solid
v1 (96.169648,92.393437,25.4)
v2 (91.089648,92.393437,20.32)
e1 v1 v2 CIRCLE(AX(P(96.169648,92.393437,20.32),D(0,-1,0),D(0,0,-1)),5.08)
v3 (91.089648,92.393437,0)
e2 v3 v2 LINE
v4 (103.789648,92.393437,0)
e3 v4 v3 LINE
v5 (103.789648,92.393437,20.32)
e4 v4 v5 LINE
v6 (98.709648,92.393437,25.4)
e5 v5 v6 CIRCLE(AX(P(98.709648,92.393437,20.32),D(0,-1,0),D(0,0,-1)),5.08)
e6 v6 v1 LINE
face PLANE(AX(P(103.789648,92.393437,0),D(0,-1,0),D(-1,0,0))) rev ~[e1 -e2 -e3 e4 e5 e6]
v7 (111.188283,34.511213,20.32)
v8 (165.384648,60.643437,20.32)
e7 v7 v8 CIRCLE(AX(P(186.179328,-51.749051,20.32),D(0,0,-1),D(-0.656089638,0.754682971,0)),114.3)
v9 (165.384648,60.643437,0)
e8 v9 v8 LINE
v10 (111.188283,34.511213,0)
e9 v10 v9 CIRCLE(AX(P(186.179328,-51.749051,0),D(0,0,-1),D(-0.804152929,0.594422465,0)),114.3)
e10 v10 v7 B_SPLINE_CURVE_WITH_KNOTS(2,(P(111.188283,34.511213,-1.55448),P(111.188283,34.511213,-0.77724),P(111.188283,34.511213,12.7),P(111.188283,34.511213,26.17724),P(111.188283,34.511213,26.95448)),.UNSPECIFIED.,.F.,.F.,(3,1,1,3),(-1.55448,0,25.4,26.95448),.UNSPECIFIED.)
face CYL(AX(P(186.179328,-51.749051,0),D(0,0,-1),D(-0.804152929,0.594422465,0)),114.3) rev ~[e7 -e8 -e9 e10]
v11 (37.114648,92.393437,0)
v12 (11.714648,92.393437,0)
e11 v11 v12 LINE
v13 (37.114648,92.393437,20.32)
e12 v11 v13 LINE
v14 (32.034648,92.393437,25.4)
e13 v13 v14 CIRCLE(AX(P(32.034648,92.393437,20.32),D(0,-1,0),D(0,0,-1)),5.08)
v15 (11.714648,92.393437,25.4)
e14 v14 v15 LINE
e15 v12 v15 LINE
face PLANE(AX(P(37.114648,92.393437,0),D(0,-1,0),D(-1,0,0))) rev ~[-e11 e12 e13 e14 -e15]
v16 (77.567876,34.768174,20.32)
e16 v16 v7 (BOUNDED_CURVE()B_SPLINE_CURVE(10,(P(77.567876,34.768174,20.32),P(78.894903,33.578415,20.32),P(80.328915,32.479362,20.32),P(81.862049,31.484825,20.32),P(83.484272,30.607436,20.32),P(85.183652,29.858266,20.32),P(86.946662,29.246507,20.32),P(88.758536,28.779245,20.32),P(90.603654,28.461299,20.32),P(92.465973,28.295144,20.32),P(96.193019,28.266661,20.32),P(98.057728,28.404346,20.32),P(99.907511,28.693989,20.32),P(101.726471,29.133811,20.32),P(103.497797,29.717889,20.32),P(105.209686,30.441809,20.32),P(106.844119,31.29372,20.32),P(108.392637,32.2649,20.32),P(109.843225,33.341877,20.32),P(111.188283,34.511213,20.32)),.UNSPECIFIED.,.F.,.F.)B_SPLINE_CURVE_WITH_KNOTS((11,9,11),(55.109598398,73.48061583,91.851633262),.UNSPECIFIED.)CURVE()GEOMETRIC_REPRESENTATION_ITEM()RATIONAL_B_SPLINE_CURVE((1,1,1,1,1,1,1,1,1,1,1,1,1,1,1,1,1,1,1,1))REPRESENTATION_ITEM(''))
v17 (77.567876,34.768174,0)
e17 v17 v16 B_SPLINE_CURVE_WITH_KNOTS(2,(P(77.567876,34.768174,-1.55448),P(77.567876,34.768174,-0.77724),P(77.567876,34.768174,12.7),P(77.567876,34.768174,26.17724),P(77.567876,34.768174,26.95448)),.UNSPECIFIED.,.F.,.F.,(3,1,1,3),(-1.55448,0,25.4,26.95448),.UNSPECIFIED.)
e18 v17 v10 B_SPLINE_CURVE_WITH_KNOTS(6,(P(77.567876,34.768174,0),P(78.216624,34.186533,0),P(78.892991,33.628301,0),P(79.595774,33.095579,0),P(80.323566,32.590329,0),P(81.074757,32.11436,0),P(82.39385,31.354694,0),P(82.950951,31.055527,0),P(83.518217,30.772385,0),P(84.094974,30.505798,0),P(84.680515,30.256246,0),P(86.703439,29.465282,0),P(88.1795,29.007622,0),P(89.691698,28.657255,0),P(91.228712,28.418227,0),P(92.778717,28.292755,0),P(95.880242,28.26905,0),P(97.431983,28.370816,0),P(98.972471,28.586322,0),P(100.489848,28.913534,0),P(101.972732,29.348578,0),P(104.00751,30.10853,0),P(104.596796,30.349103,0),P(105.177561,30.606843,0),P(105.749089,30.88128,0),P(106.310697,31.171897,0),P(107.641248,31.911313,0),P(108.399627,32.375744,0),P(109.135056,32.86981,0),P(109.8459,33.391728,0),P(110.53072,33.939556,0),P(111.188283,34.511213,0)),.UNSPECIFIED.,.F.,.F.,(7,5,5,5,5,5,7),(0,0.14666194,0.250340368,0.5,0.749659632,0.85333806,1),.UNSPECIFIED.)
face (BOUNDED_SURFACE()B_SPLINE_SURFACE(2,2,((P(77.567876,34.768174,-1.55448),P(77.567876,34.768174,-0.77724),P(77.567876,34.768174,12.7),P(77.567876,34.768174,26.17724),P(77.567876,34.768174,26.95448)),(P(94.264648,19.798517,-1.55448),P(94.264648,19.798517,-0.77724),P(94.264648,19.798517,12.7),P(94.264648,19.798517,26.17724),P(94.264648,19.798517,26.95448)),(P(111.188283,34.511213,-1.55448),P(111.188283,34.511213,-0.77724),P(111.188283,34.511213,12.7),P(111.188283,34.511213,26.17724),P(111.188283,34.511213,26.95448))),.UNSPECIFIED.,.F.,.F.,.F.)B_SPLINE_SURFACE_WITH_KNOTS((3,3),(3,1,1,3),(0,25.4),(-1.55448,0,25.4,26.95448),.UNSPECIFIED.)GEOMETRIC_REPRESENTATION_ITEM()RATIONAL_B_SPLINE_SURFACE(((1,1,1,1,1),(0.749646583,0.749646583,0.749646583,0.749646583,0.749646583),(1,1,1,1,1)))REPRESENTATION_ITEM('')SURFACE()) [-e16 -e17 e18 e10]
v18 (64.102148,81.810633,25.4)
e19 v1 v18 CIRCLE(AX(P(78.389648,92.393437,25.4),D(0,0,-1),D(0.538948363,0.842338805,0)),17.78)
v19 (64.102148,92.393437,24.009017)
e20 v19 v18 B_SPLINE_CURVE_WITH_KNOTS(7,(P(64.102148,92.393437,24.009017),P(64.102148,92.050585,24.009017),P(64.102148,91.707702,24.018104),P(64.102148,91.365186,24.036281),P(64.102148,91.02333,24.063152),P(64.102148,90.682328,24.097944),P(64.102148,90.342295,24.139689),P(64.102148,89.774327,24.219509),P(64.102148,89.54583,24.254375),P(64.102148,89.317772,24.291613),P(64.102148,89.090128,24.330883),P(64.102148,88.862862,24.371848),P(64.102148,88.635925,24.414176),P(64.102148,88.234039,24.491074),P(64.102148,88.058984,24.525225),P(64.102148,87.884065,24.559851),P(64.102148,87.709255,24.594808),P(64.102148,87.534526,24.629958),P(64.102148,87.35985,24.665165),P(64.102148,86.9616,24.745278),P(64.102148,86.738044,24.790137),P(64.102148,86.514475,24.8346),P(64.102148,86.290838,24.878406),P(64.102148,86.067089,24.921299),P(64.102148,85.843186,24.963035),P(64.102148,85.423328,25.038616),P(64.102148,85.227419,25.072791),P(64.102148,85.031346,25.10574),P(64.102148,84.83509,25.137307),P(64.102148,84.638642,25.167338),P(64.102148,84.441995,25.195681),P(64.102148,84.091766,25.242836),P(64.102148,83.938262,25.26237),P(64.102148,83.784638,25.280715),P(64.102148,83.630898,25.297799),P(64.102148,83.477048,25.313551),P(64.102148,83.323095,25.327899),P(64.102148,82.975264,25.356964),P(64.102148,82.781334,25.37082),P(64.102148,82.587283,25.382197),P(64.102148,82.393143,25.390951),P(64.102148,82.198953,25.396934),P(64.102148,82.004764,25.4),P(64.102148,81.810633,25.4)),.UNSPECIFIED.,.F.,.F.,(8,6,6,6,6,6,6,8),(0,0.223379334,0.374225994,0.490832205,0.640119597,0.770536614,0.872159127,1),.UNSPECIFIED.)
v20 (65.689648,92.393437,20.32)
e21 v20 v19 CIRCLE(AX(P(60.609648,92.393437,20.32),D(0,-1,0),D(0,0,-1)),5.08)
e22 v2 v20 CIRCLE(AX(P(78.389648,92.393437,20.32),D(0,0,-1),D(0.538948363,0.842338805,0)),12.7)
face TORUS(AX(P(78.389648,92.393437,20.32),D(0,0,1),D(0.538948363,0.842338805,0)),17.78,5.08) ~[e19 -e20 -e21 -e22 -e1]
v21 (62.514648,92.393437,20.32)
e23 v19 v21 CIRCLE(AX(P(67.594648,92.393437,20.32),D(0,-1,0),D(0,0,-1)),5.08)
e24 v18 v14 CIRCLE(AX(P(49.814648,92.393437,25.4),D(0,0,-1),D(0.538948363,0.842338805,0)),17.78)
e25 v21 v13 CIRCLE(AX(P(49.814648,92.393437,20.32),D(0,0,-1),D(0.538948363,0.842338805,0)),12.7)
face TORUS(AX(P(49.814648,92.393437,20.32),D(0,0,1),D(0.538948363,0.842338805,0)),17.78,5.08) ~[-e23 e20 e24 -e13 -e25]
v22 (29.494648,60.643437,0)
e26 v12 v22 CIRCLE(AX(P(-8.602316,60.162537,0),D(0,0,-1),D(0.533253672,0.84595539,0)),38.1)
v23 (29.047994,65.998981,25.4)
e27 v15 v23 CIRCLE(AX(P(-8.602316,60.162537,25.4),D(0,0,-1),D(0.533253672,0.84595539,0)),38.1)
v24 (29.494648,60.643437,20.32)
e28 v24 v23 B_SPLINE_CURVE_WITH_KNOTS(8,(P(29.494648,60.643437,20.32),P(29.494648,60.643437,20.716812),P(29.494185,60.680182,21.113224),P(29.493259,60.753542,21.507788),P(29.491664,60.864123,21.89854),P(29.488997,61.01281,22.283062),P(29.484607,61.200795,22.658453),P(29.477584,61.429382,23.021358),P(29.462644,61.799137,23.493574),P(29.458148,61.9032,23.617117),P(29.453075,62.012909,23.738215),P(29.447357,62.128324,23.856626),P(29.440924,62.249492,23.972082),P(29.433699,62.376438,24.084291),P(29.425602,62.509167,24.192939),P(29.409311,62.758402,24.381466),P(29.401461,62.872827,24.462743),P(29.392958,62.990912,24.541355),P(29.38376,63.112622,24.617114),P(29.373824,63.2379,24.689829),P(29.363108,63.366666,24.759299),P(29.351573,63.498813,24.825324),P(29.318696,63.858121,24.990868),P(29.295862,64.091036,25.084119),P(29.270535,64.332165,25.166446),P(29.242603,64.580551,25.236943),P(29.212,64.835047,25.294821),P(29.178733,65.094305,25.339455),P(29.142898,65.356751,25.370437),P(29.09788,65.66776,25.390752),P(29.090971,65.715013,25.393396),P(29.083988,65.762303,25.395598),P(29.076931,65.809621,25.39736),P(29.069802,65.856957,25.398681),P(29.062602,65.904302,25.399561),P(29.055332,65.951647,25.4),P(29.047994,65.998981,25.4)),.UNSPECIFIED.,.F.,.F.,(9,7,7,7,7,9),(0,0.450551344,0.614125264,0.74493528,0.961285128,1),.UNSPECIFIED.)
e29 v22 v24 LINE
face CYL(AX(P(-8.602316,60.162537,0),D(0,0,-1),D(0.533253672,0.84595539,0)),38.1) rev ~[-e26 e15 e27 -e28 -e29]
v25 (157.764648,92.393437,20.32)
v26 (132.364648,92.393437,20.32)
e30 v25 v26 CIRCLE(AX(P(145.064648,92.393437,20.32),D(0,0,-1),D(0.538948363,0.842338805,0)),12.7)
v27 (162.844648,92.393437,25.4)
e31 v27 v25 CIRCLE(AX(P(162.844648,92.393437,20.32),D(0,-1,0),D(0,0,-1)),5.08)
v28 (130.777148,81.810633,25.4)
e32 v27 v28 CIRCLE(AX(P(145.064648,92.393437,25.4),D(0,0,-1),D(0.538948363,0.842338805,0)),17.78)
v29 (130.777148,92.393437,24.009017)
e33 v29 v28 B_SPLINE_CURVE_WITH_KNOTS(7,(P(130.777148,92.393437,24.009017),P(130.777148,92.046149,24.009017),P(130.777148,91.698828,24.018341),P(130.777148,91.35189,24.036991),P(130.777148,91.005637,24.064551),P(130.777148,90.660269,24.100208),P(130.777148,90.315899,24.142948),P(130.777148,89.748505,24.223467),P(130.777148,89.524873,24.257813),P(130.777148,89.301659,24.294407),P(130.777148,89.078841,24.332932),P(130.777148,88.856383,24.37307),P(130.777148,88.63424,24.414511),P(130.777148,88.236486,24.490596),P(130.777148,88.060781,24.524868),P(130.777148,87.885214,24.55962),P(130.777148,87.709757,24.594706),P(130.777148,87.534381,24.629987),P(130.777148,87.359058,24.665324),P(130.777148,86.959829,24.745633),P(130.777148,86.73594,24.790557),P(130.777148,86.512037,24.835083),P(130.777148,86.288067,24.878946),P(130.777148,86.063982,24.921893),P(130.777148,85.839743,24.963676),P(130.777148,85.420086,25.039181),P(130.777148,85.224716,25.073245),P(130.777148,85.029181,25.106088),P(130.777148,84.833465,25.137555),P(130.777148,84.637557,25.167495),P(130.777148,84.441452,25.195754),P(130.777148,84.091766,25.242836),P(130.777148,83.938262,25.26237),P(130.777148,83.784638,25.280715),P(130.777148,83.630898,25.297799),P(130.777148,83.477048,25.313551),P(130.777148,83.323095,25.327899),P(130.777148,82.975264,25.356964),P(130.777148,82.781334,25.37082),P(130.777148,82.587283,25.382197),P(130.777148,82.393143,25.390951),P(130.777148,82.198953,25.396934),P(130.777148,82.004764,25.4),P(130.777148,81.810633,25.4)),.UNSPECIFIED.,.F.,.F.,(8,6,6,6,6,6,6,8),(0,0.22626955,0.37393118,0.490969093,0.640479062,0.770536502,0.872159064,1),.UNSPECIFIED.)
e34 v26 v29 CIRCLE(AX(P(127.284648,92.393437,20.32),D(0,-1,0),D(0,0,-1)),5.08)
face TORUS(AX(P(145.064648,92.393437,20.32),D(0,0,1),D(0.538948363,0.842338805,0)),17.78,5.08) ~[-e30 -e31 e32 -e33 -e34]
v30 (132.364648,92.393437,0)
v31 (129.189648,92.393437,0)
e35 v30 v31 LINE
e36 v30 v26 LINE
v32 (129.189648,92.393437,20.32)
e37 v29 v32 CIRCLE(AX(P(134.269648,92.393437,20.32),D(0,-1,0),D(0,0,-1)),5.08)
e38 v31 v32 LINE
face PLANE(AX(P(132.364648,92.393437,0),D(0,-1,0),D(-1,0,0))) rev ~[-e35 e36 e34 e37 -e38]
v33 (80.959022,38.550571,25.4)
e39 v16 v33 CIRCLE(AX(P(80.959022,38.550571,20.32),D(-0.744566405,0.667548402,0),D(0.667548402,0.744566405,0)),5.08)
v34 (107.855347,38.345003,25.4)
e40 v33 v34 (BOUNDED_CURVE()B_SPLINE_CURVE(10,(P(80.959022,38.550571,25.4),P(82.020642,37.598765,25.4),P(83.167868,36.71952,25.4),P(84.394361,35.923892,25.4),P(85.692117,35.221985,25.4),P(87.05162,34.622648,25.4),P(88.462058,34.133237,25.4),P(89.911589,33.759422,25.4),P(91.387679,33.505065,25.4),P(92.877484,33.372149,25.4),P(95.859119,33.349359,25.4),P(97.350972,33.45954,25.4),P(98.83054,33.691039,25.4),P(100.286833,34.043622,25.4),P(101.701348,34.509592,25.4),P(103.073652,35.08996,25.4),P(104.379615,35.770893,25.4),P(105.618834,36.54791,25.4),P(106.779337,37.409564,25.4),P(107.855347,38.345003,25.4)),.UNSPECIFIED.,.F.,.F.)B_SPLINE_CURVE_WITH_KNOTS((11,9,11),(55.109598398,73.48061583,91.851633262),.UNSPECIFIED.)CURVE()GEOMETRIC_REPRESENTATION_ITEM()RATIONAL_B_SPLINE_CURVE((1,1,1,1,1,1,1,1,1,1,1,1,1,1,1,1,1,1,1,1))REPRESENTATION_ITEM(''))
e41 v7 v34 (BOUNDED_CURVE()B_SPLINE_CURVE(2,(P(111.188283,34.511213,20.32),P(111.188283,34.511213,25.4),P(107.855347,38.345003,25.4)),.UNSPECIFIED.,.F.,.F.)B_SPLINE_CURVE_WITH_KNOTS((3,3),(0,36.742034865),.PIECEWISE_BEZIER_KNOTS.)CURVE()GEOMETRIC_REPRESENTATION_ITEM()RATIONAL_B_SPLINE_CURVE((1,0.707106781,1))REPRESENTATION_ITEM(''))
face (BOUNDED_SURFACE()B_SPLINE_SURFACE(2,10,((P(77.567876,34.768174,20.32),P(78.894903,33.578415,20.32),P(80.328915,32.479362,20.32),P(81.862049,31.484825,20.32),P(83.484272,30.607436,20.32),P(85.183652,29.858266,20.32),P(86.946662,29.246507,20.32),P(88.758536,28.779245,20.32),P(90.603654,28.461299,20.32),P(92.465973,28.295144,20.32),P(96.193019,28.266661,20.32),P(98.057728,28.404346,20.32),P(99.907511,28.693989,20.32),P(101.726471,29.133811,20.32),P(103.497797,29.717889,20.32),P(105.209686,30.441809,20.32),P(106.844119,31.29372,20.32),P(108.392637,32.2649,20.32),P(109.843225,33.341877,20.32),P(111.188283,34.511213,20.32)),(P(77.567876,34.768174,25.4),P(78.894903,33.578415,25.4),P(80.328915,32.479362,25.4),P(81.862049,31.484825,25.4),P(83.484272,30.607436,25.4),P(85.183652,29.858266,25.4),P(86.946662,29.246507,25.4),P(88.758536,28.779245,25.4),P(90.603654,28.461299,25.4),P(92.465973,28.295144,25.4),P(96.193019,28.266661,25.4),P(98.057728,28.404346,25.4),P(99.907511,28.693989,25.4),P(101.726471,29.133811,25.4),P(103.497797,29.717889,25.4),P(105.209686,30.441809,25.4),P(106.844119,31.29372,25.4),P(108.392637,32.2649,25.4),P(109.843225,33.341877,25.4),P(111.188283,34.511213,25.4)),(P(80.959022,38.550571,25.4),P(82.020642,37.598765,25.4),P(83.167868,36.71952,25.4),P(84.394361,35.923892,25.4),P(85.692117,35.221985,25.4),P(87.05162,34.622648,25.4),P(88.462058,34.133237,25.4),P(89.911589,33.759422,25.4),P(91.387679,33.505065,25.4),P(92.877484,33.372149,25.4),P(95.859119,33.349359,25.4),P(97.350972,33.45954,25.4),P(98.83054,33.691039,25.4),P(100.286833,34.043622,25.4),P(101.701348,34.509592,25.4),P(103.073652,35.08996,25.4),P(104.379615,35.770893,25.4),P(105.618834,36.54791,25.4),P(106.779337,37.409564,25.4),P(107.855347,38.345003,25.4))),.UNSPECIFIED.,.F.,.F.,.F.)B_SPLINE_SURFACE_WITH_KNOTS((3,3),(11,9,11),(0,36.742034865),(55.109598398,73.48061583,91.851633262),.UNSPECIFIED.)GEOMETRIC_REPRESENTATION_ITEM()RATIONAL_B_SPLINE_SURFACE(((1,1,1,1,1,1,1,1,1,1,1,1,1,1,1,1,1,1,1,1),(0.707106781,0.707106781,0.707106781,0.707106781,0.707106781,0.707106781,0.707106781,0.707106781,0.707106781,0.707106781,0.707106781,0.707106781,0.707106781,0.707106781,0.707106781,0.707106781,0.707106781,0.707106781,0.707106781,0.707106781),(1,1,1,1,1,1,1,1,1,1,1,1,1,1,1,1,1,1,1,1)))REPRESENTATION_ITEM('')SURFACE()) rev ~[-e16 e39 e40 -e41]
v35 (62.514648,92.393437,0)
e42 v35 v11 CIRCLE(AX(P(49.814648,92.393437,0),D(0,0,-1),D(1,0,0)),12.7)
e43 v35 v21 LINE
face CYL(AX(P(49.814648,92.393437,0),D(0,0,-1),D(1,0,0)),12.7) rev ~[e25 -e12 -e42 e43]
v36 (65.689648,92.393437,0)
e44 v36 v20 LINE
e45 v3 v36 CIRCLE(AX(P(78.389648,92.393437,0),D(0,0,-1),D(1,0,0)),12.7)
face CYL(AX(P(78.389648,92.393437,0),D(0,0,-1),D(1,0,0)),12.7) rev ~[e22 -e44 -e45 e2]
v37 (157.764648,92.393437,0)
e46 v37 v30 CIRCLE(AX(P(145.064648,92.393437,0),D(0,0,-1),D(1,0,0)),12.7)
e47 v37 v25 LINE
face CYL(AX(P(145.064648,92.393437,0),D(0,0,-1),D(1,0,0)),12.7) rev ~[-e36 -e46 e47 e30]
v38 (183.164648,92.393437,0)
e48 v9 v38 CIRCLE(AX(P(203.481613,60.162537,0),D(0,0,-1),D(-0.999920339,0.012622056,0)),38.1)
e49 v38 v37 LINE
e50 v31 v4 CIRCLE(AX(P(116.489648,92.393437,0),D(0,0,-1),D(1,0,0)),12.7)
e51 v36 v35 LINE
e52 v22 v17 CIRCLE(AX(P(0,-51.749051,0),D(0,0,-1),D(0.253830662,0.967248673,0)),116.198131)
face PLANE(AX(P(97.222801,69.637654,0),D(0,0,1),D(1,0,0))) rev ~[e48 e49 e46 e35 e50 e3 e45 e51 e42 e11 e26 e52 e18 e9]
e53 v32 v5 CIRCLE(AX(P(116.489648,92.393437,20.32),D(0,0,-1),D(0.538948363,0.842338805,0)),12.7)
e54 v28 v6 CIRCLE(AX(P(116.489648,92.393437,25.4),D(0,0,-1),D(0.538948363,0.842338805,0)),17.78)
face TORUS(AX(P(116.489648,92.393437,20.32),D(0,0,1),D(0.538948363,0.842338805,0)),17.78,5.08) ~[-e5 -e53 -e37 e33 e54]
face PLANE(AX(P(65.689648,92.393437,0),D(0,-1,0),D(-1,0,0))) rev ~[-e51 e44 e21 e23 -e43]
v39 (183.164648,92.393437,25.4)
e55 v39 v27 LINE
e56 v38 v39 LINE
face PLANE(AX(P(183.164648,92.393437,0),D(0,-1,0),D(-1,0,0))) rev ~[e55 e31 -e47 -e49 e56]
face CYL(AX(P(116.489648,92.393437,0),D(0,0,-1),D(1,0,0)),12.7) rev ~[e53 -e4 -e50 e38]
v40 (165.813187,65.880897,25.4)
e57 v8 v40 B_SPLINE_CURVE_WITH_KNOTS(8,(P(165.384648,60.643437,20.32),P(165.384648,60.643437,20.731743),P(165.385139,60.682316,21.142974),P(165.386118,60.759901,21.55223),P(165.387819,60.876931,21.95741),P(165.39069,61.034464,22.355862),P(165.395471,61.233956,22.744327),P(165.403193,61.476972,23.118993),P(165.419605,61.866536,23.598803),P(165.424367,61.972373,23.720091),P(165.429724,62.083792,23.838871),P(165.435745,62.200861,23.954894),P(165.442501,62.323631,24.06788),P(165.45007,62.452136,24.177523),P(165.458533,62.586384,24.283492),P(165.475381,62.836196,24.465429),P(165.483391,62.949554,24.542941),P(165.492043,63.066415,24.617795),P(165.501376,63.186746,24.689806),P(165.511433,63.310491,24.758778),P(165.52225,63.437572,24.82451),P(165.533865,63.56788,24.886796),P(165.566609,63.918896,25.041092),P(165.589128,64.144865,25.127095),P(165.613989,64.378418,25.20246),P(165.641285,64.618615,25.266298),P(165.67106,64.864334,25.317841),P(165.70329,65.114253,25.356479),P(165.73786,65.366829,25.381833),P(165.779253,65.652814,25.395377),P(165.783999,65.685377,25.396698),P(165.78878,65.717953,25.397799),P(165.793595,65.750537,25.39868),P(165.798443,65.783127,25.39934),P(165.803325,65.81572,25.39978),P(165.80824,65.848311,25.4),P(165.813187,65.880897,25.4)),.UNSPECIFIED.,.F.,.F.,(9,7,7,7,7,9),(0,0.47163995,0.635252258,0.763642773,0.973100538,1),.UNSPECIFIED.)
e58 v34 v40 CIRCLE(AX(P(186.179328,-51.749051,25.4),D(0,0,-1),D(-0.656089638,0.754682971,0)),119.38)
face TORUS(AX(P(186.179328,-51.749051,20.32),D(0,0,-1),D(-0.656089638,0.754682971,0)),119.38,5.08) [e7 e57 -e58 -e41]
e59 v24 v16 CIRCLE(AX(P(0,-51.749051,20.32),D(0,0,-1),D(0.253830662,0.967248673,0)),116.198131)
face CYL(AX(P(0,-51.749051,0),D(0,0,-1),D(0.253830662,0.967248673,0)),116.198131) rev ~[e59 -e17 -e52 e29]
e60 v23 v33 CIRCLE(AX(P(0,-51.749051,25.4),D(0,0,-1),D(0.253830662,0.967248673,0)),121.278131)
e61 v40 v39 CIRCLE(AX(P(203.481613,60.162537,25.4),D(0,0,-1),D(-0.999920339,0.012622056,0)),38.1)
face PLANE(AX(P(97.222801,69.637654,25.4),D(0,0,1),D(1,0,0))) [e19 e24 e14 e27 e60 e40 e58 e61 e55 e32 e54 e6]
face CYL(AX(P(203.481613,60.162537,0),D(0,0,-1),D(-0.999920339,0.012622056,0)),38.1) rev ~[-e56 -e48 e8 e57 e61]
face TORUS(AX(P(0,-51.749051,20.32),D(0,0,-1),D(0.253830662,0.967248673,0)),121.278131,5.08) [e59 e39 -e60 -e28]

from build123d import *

# Parameters (mm, degrees)
F1_DEPTH    = 25.4
F2_R        = 25.4
F3_T2_ANGLE = 294.7758439205
F3_T4_ANGLE = 294.7758439205
F3_T6_ANGLE = 294.7758439205
F3_T8_ANGLE = 294.7758439205
F4_R        = 5.08


# Not quite as in the source:
# - a fillet or chamfer that OpenCascade refuses, or shapes differently, is made with other operations: its cross-section is extruded or revolved along the edge and cut away or added


with BuildPart() as f1:
    # F0 (on Top) → F1 (new body)
    with BuildSketch(Plane.XY):
        with BuildLine():
            Line((37.1146484218, 92.3934370832), (11.7146484218, 92.3934370832))
            ThreePointArc((11.7146484218, 92.3934370832), (24.640162726, 78.7783250935), (29.4946484218, 60.6434370832))
            ThreePointArc((29.4946484218, 60.6434370832), (65.749840409, 44.0578596931), (94.2646484218, 16.1934370832))
            ThreePointArc((94.2646484218, 16.1934370832), (125.6004493922, 45.1771555306), (165.3846484218, 60.6434370832))
            ThreePointArc((165.3846484218, 60.6434370832), (170.2391341176, 78.7783250935), (183.1646484218, 92.3934370832))
            Line((183.1646484218, 92.3934370832), (157.7646484218, 92.3934370832))
            ThreePointArc((157.7646484218, 92.3934370832), (145.0646484218, 79.6934370832), (132.3646484218, 92.3934370832))
            Line((132.3646484218, 92.3934370832), (129.1896484218, 92.3934370832))
            ThreePointArc((129.1896484218, 92.3934370832), (116.4896484218, 79.6934370832), (103.7896484218, 92.3934370832))
            Line((103.7896484218, 92.3934370832), (91.0896484218, 92.3934370832))
            ThreePointArc((91.0896484218, 92.3934370832), (78.3896484218, 79.6934370832), (65.6896484218, 92.3934370832))
            Line((65.6896484218, 92.3934370832), (62.5146484218, 92.3934370832))
            ThreePointArc((62.5146484218, 92.3934370832), (49.8146484218, 79.6934370832), (37.1146484218, 92.3934370832))
        make_face()
    extrude(amount=F1_DEPTH)

    # F2
    f2_edges = [f1.edges().sort_by_distance(p)[0] for p in [
        (94.264648, 16.193437, 12.7),
    ]]
    fillet(f2_edges, radius=F2_R)

    # F3: fillet of radius 5.08 on 4 edges, made by hand

    # F3_s1 → F3_t2 (revolve, cut)
    with BuildSketch(Plane(origin=(-6.5992867665, 4.2223803326, 0), x_dir=(0, 0, 1), z_dir=(-0.8423388046, 0.5389483633, 0))):
        with BuildLine():
            ThreePointArc((25.4, 122.4541005786), (23.9121024484, 118.8619981302), (20.32, 117.3741005786))
            Line((20.32, 117.3741005786), (25.4, 117.3741005786))
            Line((25.4, 117.3741005786), (25.4, 122.4541005786))
        make_face()
    revolve(axis=Axis((49.8146484218, 92.3934370832, 25.4), (0, 0, -1)), revolution_arc=F3_T2_ANGLE, mode=Mode.SUBTRACT)

    # F3_s3 → F3_t4 (revolve, cut)
    with BuildSketch(Plane(origin=(40.7089368011, -26.0465441486, 0), x_dir=(0, 0, 1), z_dir=(-0.8423388046, 0.5389483633, 0))):
        with BuildLine():
            ThreePointArc((25.4, 158.3884827026), (23.9121024484, 154.7963802542), (20.32, 153.3084827026))
            Line((20.32, 153.3084827026), (25.4, 153.3084827026))
            Line((25.4, 153.3084827026), (25.4, 158.3884827026))
        make_face()
    revolve(axis=Axis((116.4896484218, 92.3934370832, 25.4), (0, 0, -1)), revolution_arc=F3_T4_ANGLE, mode=Mode.SUBTRACT)

    # F3_s5 → F3_t6 (revolve, cut)
    with BuildSketch(Plane(origin=(60.9838897586, -39.0189403548, 0), x_dir=(0, 0, 1), z_dir=(-0.8423388046, 0.5389483633, 0))):
        with BuildLine():
            ThreePointArc((25.4, 173.7889321843), (23.9121024484, 170.1968297359), (20.32, 168.7089321843))
            Line((20.32, 168.7089321843), (25.4, 168.7089321843))
            Line((25.4, 168.7089321843), (25.4, 173.7889321843))
        make_face()
    revolve(axis=Axis((145.0646484218, 92.3934370832, 25.4), (0, 0, -1)), revolution_arc=F3_T6_ANGLE, mode=Mode.SUBTRACT)

    # F3_s7 → F3_t8 (revolve, cut)
    with BuildSketch(Plane(origin=(13.6756661911, -8.7500158736, 0), x_dir=(0, 0, 1), z_dir=(-0.8423388046, 0.5389483633, 0))):
        with BuildLine():
            ThreePointArc((25.4, 137.8545500603), (23.9121024484, 134.2624476119), (20.32, 132.7745500603))
            Line((20.32, 132.7745500603), (25.4, 132.7745500603))
            Line((25.4, 132.7745500603), (25.4, 137.8545500603))
        make_face()
    revolve(axis=Axis((78.3896484218, 92.3934370832, 25.4), (0, 0, -1)), revolution_arc=F3_T8_ANGLE, mode=Mode.SUBTRACT)

    # F4
    f4_edges = [f1.edges().sort_by_distance(p)[0] for p in [
        (94.329479, 28.280902, 25.4),
    ]]
    fillet(f4_edges, radius=F4_R)


with BuildPart() as f5_1:
    # F5: copy of F1
    add(f1.part)


with BuildPart() as f6_1:
    # F6: copy of F5_1
    add(f5_1.part.moved(Location((0, 0, 50.8))))


solid = f1.part
